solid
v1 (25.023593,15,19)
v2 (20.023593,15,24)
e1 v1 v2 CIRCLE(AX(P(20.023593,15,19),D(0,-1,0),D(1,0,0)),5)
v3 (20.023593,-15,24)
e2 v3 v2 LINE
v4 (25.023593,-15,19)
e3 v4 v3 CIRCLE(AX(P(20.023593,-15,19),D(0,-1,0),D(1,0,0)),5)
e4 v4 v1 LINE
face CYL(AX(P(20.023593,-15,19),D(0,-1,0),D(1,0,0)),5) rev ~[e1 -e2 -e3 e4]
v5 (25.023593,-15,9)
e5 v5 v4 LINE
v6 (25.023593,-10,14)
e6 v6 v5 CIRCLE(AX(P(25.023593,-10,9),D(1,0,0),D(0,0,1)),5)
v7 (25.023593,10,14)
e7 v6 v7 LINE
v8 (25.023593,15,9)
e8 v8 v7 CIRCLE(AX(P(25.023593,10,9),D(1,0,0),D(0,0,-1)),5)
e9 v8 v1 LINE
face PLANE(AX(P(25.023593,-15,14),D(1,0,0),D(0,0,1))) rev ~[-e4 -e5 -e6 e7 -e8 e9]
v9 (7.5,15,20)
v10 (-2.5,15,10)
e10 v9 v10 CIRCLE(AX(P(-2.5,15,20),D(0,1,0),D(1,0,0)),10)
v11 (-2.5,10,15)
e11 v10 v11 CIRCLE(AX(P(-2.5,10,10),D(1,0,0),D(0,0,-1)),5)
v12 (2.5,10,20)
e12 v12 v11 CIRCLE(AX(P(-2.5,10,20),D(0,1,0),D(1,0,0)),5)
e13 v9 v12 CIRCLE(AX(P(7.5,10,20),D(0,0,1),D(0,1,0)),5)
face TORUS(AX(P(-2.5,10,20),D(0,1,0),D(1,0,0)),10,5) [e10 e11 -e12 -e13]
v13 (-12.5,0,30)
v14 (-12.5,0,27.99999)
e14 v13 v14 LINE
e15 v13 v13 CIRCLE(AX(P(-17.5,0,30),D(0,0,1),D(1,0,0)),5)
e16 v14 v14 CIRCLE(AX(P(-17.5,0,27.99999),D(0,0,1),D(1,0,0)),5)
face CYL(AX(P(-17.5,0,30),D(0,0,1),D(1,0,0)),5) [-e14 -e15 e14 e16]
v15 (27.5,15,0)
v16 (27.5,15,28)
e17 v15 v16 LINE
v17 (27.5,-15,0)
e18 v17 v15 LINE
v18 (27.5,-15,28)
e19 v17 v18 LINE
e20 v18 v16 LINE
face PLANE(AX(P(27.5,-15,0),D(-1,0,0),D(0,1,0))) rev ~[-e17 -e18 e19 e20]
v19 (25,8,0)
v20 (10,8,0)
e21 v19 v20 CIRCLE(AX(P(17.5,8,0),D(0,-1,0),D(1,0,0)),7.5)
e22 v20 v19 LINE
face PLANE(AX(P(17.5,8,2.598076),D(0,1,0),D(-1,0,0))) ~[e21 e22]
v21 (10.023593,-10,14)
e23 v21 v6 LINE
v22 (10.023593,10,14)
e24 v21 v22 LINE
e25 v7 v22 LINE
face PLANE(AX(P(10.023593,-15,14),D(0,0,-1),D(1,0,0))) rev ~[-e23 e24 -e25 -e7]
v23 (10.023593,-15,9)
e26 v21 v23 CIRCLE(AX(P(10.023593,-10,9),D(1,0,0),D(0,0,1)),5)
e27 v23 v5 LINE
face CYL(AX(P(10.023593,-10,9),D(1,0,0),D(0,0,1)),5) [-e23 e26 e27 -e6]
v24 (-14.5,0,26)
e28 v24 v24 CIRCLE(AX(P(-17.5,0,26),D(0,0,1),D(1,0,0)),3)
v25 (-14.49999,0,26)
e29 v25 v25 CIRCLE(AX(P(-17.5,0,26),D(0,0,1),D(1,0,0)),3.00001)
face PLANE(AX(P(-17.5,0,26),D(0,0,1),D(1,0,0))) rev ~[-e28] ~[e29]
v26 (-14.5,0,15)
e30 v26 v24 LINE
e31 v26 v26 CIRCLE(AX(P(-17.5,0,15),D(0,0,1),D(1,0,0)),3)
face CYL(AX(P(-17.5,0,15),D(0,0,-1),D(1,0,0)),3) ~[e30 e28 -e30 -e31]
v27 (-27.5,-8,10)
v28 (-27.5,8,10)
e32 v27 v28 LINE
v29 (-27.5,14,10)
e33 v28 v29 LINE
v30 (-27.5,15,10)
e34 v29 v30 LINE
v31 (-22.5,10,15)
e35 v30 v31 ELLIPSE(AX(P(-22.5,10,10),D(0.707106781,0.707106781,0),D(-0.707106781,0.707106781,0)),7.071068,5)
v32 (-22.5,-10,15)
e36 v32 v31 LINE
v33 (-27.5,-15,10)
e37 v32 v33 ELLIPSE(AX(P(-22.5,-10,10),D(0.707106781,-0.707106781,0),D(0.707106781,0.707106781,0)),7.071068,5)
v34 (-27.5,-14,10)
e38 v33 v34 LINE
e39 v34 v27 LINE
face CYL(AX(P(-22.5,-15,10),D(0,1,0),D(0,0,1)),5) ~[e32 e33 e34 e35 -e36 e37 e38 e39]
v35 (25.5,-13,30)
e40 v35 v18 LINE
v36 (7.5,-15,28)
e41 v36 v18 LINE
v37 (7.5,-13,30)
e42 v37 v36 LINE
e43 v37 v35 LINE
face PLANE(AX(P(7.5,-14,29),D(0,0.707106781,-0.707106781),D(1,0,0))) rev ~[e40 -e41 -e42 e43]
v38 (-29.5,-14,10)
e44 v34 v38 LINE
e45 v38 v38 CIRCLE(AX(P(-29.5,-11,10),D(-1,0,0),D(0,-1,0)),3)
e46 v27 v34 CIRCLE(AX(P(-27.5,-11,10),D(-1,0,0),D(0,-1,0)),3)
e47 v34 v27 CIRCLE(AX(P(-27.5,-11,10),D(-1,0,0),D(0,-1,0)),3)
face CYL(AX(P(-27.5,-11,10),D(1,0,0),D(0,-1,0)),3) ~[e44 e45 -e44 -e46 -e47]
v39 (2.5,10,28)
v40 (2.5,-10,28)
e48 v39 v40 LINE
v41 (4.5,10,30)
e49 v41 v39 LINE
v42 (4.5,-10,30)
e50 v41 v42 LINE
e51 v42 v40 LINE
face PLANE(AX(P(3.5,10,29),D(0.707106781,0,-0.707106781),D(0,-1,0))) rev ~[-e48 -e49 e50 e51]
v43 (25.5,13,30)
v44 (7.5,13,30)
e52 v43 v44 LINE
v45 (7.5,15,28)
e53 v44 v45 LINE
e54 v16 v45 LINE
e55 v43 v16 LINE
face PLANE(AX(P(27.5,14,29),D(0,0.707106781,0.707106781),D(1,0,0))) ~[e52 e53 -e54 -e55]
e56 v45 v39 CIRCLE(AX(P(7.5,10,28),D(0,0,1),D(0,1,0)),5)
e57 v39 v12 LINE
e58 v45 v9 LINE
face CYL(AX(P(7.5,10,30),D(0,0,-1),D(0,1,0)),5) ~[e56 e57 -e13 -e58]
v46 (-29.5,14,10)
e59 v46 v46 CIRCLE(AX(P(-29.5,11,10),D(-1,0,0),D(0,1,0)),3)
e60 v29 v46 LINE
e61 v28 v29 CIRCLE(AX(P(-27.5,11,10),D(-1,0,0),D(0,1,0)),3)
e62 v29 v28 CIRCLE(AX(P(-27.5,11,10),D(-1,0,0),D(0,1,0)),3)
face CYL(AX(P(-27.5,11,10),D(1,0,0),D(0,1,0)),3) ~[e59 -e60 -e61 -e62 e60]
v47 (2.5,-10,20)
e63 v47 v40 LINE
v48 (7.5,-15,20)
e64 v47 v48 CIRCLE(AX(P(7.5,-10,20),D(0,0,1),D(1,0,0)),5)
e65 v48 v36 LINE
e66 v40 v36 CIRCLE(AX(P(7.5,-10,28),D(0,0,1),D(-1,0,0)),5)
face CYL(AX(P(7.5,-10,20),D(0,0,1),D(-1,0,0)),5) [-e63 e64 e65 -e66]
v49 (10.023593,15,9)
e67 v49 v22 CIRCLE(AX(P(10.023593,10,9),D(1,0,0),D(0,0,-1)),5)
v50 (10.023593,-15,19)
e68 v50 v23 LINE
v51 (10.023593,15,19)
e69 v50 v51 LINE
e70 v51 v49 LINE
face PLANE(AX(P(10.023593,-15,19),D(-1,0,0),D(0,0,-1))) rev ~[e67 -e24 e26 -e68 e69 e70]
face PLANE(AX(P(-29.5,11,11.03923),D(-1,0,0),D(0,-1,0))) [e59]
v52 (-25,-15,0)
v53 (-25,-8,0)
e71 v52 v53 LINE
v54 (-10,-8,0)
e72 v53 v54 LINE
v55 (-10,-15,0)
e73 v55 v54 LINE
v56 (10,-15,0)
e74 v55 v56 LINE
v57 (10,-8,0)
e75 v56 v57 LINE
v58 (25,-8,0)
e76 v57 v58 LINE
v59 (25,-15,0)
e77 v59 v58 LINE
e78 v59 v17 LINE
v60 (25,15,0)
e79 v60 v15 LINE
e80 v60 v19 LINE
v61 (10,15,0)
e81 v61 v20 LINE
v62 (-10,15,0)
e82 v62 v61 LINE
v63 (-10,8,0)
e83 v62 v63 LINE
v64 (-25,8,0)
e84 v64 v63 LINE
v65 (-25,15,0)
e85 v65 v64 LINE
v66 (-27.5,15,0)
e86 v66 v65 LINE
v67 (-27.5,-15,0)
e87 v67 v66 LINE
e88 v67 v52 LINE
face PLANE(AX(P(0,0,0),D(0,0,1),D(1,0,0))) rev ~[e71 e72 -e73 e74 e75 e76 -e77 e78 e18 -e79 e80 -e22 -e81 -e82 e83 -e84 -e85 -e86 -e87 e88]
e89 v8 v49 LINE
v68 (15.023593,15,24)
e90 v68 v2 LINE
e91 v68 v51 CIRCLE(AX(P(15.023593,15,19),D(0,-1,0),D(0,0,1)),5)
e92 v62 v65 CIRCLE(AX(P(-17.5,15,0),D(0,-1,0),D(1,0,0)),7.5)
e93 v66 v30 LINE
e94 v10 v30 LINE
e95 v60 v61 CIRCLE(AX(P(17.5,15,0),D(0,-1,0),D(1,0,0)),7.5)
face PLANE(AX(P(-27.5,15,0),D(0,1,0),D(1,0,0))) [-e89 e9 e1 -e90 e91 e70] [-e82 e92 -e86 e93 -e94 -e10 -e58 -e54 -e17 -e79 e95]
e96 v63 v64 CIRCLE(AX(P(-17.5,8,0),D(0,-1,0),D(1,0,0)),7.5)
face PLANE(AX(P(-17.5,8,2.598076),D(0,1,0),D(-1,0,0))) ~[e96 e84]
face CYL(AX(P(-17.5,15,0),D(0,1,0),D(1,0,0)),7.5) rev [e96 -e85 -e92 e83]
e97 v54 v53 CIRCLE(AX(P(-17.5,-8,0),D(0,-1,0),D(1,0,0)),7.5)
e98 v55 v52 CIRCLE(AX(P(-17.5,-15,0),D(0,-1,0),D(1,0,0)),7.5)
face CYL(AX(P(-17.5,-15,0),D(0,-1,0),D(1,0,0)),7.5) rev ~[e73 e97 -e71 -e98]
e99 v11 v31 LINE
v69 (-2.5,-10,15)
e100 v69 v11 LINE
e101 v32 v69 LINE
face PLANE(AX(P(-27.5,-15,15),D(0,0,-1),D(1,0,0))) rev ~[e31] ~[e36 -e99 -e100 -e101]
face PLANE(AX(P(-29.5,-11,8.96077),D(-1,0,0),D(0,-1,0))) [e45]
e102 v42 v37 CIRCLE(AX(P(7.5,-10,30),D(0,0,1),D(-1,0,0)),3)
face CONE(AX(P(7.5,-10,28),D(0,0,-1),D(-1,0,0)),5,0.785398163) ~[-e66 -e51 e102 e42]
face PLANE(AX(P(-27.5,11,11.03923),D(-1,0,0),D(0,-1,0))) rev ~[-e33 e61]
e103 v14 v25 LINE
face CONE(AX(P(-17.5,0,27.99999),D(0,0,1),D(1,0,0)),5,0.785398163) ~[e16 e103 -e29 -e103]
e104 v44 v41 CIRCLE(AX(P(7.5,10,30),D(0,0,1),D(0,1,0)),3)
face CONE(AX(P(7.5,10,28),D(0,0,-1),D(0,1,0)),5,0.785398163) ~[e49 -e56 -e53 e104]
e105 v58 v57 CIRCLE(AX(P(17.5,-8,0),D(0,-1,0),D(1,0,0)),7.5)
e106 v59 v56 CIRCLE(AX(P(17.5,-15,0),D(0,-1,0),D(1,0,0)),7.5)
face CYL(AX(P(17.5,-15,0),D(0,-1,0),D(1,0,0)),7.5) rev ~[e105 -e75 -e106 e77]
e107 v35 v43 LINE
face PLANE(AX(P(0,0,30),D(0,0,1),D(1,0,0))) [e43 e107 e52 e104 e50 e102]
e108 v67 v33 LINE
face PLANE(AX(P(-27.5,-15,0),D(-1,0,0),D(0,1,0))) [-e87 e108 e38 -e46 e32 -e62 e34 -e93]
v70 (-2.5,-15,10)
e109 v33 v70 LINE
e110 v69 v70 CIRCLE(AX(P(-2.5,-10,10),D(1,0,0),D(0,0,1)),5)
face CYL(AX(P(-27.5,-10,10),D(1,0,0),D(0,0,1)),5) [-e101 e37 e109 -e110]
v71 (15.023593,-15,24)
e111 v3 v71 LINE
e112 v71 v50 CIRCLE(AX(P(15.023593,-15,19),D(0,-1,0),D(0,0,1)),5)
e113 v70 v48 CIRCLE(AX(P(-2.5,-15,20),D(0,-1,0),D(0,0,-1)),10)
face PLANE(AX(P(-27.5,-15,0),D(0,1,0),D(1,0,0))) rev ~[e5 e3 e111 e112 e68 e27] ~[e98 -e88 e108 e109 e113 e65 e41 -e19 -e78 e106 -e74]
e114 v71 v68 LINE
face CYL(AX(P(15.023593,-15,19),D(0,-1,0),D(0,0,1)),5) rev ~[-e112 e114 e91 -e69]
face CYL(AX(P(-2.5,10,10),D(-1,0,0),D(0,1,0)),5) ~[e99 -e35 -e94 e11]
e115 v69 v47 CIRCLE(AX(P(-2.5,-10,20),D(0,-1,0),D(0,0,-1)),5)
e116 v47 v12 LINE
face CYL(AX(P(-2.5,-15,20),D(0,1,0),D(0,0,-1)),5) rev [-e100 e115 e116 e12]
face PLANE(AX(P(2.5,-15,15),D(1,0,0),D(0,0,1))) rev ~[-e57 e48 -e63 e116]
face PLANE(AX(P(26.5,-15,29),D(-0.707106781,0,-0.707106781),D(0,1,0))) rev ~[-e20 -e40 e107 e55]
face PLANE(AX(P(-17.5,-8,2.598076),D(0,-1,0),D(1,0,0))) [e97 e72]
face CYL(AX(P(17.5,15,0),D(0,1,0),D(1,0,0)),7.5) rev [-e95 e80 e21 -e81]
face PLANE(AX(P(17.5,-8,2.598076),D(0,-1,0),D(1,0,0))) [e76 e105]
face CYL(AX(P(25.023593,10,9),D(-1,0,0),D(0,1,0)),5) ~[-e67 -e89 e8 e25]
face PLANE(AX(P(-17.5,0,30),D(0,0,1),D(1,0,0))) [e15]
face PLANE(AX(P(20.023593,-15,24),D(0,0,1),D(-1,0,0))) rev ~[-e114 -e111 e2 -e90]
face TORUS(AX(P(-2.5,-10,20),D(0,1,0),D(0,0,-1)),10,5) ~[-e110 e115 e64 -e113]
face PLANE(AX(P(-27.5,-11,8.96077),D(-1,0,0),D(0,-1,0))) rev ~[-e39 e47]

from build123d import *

# Parameters (mm, degrees)
F0_W      = 55
F0_H      = 30
F1_DEPTH  = 30
F2_W      = 30
F2_H      = 15
F3_DEPTH  = 30.001
F5_DEPTH  = 7
F6_F1_R   = 5
F6_F2_R   = 5
F7_SIZE   = 2
F9_DEPTH  = 30.001
F10_R     = 5
F12_DEPTH = 2
F13_R     = 3
F14_DEPTH = 15
F15_R     = 5
F15_R_2   = 3
F16_DEPTH = 4
F17_SIZE  = 1.99999


# Not quite as in the source:
# - a fillet or chamfer is up to 0.001 mm smaller than in the source, because OpenCascade refuses the exact size
# - a pattern or mirror of a feature is missing from the dataset's text; its kind, count and spacing are read off the source's solid


with BuildPart() as f1:
    # F0 (on Top) → F1 (new body)
    with BuildSketch(Plane.XY):
        Rectangle(F0_W, F0_H)
    extrude(amount=F1_DEPTH)

    # F2 (on face) → F3 (cut, through all)
    with BuildSketch(Plane.XZ.offset(15)):
        with Locations((-12.5, 22.5)):
            Rectangle(F2_W, F2_H)
    extrude(amount=-F3_DEPTH, mode=Mode.SUBTRACT)

    # F4 (on face) → F5 (cut)
    with BuildSketch(Plane.XZ.offset(15)):
        with BuildLine():
            Line((-25, 0), (-10, 0))
            ThreePointArc((-10, 0), (-17.5, 7.5), (-25, 0))
        make_face()
        with BuildLine():
            ThreePointArc((25, 0), (17.5, 7.5), (10, 0))
            Line((10, 0), (25, 0))
        make_face()
    f5 = extrude(amount=-F5_DEPTH, mode=Mode.SUBTRACT)

    # F5_copies: F5 across plane
    add(f5.mirror(Plane.ZX), mode=Mode.SUBTRACT)

    # F6: fillet of radius 5 on 4 edges, made by hand

    # F6_f1
    f6_f1_edges = [f1.edges().sort_by_distance(p)[0] for p in [
        (2.5, 0, 15),
    ]]
    fillet(f6_f1_edges, radius=F6_F1_R)

    # F6_f2
    f6_f2_edges = [f1.edges().sort_by_distance(p)[0] for p in [
        (-15, -15, 15),
        (-15, 15, 15),
        (-27.5, 0, 15),
        (1.0355339059, 15, 16.4644660941),
        (1.0355339059, -15, 16.4644660941),
    ]]
    fillet(f6_f2_edges, radius=F6_F2_R)

    # F7
    f7_edges = [f1.edges().sort_by_distance(p)[0] for p in [
        (17.5, -15, 30),
        (3.964466, -13.535534, 30),
        (27.5, 0, 30),
        (2.5, 0, 30),
        (17.5, 15, 30),
        (3.964466, 13.535534, 30),
    ]]
    chamfer(f7_edges, length=F7_SIZE)

    # F8 (on face) → F9 (cut, through all)
    with BuildSketch(Plane.XZ.offset(15)):
        with BuildLine():
            Line((20.0235929713, 24), (15.0235929713, 24))
            ThreePointArc((15.0235929713, 24), (11.4880590653, 22.5355339059), (10.0235929713, 19))
            Line((10.0235929713, 19), (10.0235929713, 14))
            Line((10.0235929713, 14), (25.0235929713, 14))
            Line((25.0235929713, 14), (25.0235929713, 19))
            ThreePointArc((25.0235929713, 19), (23.5591268772, 22.5355339059), (20.0235929713, 24))
        make_face()
    extrude(amount=-F9_DEPTH, mode=Mode.SUBTRACT)

    # F10
    f10_edges = [f1.edges().sort_by_distance(p)[0] for p in [
        (17.523593, -15, 14),
        (17.523593, 15, 14),
    ]]
    fillet(f10_edges, radius=F10_R)

    # F11 (on face) → F12 (join)
    with BuildSketch(Plane(origin=(-27.5, 0, 0), x_dir=(0, -1, 0), z_dir=(-1, 0, 0))):
        with BuildLine():
            Line((-14, 10), (-8, 10))
            ThreePointArc((-8, 10), (-11, 13), (-14, 10))
        make_face()
        with BuildLine():
            ThreePointArc((-14, 10), (-11, 7), (-8, 10))
            Line((-8, 10), (-14, 10))
        make_face()
        with BuildLine():
            Line((14, 10), (8, 10))
            ThreePointArc((8, 10), (11, 7), (14, 10))
        make_face()
        with BuildLine():
            ThreePointArc((14, 10), (11, 13), (8, 10))
            Line((8, 10), (14, 10))
        make_face()
    extrude(amount=F12_DEPTH)

    # F13 (on face) → F14 (join)
    with BuildSketch(Plane.XY.offset(15)):
        with Locations((-17.5, 0)):
            Circle(F13_R)
    extrude(amount=F14_DEPTH)

    # F15 (on face) → F16 (join)
    with BuildSketch(Plane.XY.offset(30)):
        with Locations((-17.5, 0)):
            Circle(F15_R)
        with Locations((-17.5, 0)):
            Circle(F15_R_2, mode=Mode.SUBTRACT)
    extrude(amount=-F16_DEPTH)

    # F17 (size 2 in the source; OpenCascade refuses exactly that, so slightly less here)
    f17_edges = [f1.edges().sort_by_distance(p)[0] for p in [
        (-22.5, 0, 26),
    ]]
    chamfer(f17_edges, length=F17_SIZE)


solid = f1.part
